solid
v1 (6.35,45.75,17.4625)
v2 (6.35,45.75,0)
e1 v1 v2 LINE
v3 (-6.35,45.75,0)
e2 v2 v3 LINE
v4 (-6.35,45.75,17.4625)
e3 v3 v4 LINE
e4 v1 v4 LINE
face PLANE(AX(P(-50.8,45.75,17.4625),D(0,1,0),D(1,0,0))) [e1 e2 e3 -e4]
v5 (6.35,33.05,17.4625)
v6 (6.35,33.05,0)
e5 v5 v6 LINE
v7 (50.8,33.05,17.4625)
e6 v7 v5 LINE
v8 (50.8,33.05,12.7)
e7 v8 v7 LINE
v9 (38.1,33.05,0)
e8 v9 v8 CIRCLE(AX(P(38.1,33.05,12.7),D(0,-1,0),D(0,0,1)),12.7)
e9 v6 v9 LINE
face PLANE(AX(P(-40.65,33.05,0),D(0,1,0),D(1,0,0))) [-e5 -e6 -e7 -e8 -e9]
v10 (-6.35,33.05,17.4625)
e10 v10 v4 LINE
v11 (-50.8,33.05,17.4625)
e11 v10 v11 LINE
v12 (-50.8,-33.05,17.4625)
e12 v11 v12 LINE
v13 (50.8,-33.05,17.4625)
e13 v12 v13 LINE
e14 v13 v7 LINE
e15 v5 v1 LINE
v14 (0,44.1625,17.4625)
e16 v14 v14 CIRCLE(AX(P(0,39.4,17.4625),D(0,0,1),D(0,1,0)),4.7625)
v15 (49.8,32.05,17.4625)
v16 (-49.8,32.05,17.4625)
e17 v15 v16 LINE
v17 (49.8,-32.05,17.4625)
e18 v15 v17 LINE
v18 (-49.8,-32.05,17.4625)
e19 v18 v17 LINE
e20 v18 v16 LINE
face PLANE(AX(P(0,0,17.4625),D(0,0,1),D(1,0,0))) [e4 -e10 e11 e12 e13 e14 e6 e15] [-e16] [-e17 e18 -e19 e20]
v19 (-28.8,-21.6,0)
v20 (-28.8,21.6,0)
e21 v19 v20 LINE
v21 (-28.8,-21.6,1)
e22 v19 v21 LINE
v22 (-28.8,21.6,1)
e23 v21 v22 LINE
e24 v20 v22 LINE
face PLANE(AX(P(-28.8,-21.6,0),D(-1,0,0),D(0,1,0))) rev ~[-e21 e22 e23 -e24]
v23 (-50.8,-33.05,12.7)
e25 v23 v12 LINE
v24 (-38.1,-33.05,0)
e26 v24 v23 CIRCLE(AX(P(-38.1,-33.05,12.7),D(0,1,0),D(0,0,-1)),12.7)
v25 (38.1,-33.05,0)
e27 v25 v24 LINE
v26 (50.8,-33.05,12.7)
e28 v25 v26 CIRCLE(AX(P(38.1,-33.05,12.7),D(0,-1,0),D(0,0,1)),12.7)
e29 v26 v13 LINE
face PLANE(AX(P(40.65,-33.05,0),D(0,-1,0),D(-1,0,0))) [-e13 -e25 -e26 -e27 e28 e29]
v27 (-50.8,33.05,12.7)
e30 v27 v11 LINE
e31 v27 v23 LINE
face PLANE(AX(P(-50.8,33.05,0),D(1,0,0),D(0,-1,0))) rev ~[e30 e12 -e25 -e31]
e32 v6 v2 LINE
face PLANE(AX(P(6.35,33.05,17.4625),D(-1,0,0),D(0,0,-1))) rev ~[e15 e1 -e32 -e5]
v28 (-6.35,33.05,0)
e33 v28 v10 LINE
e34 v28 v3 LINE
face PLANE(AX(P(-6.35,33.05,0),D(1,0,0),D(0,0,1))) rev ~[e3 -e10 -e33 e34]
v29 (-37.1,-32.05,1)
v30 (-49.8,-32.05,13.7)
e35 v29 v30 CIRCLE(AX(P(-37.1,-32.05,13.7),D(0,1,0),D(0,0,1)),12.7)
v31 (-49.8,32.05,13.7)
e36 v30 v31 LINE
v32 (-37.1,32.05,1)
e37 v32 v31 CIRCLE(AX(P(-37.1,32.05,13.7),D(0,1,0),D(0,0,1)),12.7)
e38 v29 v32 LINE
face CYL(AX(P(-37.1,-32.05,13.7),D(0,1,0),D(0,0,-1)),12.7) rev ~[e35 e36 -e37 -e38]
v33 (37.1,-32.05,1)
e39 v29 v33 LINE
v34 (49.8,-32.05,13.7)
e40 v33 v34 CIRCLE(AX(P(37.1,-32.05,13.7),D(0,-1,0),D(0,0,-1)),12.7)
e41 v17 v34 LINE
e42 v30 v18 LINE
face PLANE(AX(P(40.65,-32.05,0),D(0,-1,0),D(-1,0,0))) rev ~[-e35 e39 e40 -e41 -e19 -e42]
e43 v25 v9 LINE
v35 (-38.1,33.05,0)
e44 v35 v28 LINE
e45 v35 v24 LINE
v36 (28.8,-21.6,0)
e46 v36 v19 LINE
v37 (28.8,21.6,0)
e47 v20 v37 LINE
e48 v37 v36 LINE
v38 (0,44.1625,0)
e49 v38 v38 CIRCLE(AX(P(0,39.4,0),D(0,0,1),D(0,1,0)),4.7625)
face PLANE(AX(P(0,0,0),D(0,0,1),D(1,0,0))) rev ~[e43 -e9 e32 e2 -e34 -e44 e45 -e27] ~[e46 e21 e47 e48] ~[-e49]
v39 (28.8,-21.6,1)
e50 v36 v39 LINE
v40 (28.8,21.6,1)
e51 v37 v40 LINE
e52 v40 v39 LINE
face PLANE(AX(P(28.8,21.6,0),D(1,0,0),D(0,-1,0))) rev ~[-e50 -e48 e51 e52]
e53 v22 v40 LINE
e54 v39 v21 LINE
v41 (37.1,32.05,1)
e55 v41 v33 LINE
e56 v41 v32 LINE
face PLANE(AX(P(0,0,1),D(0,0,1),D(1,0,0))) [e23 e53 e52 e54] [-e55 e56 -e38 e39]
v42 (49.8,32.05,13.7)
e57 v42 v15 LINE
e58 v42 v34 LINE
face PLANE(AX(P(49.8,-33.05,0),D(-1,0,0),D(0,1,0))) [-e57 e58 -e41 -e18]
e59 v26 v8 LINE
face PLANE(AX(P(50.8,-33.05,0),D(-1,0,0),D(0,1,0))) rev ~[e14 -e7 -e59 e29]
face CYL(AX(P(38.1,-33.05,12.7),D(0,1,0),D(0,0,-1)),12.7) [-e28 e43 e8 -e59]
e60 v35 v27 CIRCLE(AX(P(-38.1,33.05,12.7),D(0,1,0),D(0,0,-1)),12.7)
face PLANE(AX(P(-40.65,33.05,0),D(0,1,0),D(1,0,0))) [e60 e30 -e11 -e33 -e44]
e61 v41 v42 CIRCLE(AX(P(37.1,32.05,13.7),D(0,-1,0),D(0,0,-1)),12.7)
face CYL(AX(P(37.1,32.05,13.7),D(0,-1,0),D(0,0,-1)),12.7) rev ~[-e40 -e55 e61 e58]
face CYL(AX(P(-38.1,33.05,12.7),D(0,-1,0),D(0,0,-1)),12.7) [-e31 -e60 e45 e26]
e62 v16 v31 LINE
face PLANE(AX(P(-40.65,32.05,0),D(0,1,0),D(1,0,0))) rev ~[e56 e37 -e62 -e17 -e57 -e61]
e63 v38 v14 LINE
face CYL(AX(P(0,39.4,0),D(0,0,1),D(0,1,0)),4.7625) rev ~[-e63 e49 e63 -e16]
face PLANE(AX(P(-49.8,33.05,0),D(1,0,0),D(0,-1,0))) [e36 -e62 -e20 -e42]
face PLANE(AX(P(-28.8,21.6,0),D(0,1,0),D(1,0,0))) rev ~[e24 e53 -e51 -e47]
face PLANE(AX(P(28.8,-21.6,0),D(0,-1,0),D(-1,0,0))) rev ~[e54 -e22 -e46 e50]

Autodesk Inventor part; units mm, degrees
ref_plane "YZ Plane" through (0, 0, 0) normal (1, 0, 0) x (0, 1, 0)
ref_plane "XZ Plane" through (0, 0, 0) normal (0, 1, 0) x (-1, 0, 0)
ref_plane "XY Plane" through (0, 0, 0) normal (0, 0, 1) x (1, 0, 0)
sketch "Sketch1" plane through (0, 0, 0) normal (0, 0, 1) x (1, 0, 0)
  line L0 (28.8, -21.6) -> (-28.8, -21.6)
  line L1 (-28.8, -21.6) -> (-28.8, 21.6)
  line L2 (-28.8, 21.6) -> (28.8, 21.6)
  line L3 (28.8, 21.6) -> (28.8, -21.6)
  line L4 (28.8, -21.6) -> (-28.8, 21.6) construction
  line L5 (-28.8, -21.6) -> (28.8, 21.6) construction
  line L6 (-34.3, -26.7) -> (34.3, -26.7)
  line L7 (34.3, -26.7) -> (34.3, 26.7)
  line L8 (34.3, 26.7) -> (-34.3, 26.7)
  line L9 (-34.3, 26.7) -> (-34.3, -26.7)
  line L10 (-34.3, -26.7) -> (34.3, 26.7) construction
  line L11 (34.3, -26.7) -> (-34.3, 26.7) construction
  line L12 (-40.65, 33.05) -> (40.65, 33.05)
  line L13 (40.65, 33.05) -> (40.65, -33.05)
  line L14 (40.65, -33.05) -> (-40.65, -33.05)
  line L15 (-40.65, -33.05) -> (-40.65, 33.05)
  line L16 (-50.8, -33.05) -> (50.8, -33.05)
  line L17 (50.8, -33.05) -> (50.8, 33.05)
  line L18 (50.8, 33.05) -> (-50.8, 33.05)
  line L19 (-50.8, 33.05) -> (-50.8, -33.05)
  line L20 (-50.8, -33.05) -> (50.8, 33.05) construction
  line L21 (50.8, -33.05) -> (-50.8, 33.05) construction
  point P0 (0, 0)
  dimension "d0" = 43.2
  dimension "d1" = 57.6
  dimension "d2" = 68.6
  dimension "d3" = 53.4
  dimension "d4" = 6.35
  dimension "d7" = 101.6
  dimension "d8" = 66.1
extrude "Extrusion1" add sketch "Sketch1" along normal blind 17.4625 contours L9 L8 L7 L6 | L12 L13 L14 L15 | L15 L16 L19 L18 | L18 L17 L16 L13
shell "Shell1" thickness 1 removed faces 5 at (-43.4667, 7.2, 17.4625) at (-28.8, -7.2, 5.8208) at (-9.6, 21.6, 5.8208) at (28.8, 7.2, 5.8208) at (9.6, -21.6, 5.8208)
fillet "Fillet1" radius 12.7 2 edges at (-50.8, 0, 0) (50.8, 0, 0)
sketch "Sketch2" plane through (-50.8, 33.05, 17.4625) normal (0, 1, 0) x (1, 0, 0)
  arc A0 (101.6, 4.7625) -> (88.9, 17.4625) centre (88.9, 4.7625) ccw projected
  line L0 (88.9, 17.4625) -> (12.7, 17.4625) projected
  arc A1 (12.7, 17.4625) -> (0, 4.7625) centre (12.7, 4.7625) ccw projected
  line L1 (0, 4.7625) -> (0, 0) projected
  line L2 (101.6, 0) -> (0, 0) projected
  line L3 (101.6, 4.7625) -> (101.6, 0) projected
  line L4 (101.6, 0) -> (0, 0) construction
  line L5 (50.8, 0) -> (50.8, 17.4625) construction
  line L6 (57.15, 17.4625) -> (44.45, 17.4625)
  line L7 (44.45, 17.4625) -> (44.45, 0)
  line L8 (44.45, 0) -> (57.15, 0)
  line L9 (57.15, 0) -> (57.15, 17.4625)
  dimension "d11" = 12.7
extrude "Extrusion2" add sketch "Sketch2" along normal blind 12.7 contours L9 L2 L7 L0
sketch "Sketch3" plane through (0, 0, 0) normal (0, 0, -1) x (-1, 0, 0)
  line L0 (-38.1, -33.05) -> (-38.1, 33.05) projected
  line L1 (38.1, -33.05) -> (-38.1, -33.05) projected
  line L2 (38.1, 33.05) -> (38.1, -33.05) projected
  line L3 (6.35, 33.05) -> (38.1, 33.05) projected
  line L4 (6.35, 33.05) -> (6.35, 45.75) projected
  line L5 (-6.35, 45.75) -> (6.35, 45.75) projected
  line L6 (-6.35, 33.05) -> (-6.35, 45.75) projected
  line L7 (-38.1, 33.05) -> (-6.35, 33.05) projected
  line L8 (28.8, 21.6) -> (28.8, -21.6) projected
  line L9 (28.8, -21.6) -> (-28.8, -21.6) projected
  line L10 (-28.8, -21.6) -> (-28.8, 21.6) projected
  line L11 (-28.8, 21.6) -> (28.8, 21.6) projected
  line L12 (-6.35, 45.75) -> (6.35, 33.05) construction
  line L13 (6.35, 33.05) -> (6.35, 45.75) construction
  line L14 (6.35, 45.75) -> (-6.35, 33.05) construction
  point P0 (0, 0)
  point P1 (0, 39.4)
hole "Hole1" at (0, 39.4, 0) direction (0, 0, 1) diameter 9.525 end through all
fillet "Fillet2" radius 12.7 2 edges at (-49.8, 0, 1) (49.8, 0, 1)
equation "\"d8\" = 2 * d4 + d3"
properties part number "Back"
